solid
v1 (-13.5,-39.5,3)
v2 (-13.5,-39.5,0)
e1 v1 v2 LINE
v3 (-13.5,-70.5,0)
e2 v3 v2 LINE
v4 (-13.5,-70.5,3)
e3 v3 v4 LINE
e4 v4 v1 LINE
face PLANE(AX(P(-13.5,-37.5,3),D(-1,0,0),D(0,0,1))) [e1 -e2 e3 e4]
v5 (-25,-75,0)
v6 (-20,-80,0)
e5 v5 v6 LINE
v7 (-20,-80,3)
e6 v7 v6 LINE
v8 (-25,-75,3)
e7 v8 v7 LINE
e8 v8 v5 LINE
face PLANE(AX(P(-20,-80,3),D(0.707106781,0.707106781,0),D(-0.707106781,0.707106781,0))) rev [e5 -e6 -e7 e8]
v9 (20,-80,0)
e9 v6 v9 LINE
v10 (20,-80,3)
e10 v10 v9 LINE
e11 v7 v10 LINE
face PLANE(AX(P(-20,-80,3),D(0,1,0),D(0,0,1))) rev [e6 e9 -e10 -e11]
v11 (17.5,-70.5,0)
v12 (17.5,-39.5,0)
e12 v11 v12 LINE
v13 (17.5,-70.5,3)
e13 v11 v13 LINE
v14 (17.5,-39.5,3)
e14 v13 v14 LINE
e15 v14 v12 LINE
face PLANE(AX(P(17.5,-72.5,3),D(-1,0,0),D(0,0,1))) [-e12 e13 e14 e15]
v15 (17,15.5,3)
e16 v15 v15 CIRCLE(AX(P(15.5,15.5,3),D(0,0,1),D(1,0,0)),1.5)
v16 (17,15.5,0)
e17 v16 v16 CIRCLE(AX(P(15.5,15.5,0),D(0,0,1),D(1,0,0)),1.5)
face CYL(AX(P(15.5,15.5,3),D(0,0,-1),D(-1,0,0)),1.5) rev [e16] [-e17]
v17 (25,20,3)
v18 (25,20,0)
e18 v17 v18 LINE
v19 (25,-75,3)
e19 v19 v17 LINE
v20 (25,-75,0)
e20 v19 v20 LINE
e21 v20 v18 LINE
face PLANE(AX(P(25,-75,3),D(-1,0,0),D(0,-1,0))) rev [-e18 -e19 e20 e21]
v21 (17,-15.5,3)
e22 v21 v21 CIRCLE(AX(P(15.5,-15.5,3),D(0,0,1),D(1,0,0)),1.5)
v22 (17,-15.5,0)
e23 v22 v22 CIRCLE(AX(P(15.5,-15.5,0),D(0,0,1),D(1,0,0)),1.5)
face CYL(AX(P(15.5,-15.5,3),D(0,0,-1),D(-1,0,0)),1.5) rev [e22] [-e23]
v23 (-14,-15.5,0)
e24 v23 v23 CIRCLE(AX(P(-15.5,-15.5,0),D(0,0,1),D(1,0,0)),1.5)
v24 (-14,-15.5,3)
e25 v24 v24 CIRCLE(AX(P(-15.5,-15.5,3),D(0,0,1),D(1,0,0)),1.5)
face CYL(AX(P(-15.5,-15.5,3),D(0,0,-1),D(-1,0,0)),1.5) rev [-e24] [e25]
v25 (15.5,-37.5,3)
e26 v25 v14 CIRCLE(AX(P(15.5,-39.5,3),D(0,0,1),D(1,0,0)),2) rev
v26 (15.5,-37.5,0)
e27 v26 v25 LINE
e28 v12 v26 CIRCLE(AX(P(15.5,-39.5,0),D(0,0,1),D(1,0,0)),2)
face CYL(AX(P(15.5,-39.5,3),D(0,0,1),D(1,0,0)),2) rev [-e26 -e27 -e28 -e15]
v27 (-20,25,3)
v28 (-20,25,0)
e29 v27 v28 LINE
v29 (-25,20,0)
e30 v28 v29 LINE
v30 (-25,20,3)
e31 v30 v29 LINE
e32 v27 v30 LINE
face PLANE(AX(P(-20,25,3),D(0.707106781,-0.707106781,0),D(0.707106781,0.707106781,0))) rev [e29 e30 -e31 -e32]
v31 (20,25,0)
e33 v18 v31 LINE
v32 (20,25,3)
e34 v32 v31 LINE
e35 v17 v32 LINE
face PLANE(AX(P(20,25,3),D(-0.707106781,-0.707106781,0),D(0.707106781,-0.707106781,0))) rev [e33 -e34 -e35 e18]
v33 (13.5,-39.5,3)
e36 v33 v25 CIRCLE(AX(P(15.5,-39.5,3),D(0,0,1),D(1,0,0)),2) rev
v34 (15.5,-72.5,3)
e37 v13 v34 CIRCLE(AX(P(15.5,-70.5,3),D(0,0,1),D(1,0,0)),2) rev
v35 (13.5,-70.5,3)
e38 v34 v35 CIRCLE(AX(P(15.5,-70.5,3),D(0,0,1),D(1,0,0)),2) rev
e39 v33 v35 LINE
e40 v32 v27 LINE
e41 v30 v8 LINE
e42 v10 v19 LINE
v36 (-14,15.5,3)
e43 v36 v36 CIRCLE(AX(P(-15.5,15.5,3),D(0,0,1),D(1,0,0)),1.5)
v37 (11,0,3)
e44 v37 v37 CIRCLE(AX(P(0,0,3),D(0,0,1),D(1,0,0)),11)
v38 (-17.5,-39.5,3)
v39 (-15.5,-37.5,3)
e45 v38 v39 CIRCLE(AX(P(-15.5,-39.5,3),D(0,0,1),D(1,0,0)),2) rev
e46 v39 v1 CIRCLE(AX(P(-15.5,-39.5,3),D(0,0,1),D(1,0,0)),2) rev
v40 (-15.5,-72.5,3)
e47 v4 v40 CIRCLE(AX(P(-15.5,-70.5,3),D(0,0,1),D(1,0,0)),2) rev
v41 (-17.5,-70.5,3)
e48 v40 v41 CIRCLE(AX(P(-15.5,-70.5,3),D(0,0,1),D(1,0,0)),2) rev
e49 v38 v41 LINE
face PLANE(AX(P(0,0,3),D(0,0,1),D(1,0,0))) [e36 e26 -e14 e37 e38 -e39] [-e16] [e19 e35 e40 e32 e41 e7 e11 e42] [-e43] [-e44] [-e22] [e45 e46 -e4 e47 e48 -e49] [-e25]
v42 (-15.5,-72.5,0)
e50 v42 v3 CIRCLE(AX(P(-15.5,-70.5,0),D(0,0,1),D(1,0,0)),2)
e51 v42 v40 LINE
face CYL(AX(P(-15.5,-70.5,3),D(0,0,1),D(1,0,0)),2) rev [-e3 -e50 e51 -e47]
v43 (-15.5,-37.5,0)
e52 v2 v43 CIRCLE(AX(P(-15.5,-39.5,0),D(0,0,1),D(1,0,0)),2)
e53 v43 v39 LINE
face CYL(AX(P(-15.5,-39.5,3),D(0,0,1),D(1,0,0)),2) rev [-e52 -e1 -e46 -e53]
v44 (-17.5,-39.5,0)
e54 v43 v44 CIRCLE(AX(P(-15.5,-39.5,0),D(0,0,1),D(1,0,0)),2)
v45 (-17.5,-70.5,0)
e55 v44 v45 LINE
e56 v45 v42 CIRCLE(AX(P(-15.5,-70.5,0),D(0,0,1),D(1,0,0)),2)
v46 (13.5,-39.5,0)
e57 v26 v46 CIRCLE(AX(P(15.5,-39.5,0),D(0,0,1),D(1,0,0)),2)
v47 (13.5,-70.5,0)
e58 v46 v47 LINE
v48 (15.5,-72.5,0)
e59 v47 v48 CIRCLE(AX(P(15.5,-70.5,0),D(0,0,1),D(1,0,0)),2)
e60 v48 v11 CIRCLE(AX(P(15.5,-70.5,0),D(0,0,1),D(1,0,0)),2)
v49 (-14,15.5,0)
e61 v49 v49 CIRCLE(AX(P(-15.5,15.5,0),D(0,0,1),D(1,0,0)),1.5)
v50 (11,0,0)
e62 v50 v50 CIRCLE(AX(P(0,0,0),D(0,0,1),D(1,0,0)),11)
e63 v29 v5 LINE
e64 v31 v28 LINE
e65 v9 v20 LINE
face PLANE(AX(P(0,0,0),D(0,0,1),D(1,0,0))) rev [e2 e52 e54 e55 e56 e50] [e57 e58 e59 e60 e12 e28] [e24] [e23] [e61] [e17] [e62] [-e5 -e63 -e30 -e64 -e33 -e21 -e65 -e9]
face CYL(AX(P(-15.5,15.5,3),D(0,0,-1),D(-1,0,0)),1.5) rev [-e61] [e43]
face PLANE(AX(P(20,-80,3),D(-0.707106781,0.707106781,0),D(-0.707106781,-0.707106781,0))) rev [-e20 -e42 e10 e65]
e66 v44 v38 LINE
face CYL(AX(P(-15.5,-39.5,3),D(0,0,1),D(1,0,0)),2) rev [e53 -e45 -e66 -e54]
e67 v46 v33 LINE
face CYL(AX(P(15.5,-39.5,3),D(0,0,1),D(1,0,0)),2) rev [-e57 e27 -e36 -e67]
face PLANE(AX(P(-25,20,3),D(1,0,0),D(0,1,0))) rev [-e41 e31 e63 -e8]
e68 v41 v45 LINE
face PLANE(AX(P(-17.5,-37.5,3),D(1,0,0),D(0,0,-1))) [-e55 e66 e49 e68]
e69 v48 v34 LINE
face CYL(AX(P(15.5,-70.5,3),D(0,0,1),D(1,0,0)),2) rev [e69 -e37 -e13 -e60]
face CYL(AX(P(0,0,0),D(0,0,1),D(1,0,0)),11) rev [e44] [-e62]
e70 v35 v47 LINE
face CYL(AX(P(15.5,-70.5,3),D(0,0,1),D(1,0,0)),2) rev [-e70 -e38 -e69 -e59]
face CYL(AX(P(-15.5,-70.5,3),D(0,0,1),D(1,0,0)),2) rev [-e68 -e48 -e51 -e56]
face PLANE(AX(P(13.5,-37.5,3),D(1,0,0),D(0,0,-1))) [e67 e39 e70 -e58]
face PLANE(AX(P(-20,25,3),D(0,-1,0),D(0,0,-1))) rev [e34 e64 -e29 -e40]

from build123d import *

# Parameters (mm, degrees)
SKETCH_1_R          = 1.5
SKETCH_1_W          = 4
SKETCH_1_H          = 35
EXTRUDE_1_DEPTH     = 3
FILLET_1_R          = 2
SKETCH_2_R          = 11
CUT_EXTRUDE_1_DEPTH = 3


with BuildPart() as part:
    # 草图1 → 凸台-拉伸1 (new body)
    with BuildSketch(Plane.XY):
        Polygon((-20, 25), (-25, 20), (-25, -75), (-20, -80), (20, -80), (25, -75), (25, 20), (20, 25), align=None)
        with Locations((-15.5, 15.5)):
            Circle(SKETCH_1_R, mode=Mode.SUBTRACT)
        with Locations((15.5, 15.5)):
            Circle(SKETCH_1_R, mode=Mode.SUBTRACT)
        with Locations((15.5, -15.5)):
            Circle(SKETCH_1_R, mode=Mode.SUBTRACT)
        with Locations((-15.5, -15.5)):
            Circle(SKETCH_1_R, mode=Mode.SUBTRACT)
        with Locations((-15.5, -55)):
            Rectangle(SKETCH_1_W, SKETCH_1_H, mode=Mode.SUBTRACT)
        with Locations((15.5, -55)):
            Rectangle(SKETCH_1_W, SKETCH_1_H, mode=Mode.SUBTRACT)
    extrude(amount=EXTRUDE_1_DEPTH)

    # 圆角1
    fillet_1_edges = [part.edges().sort_by_distance(p)[0] for p in [
        (17.5, -72.5, 1.5),
        (-13.5, -72.5, 1.5),
        (13.5, -37.5, 1.5),
        (-17.5, -37.5, 1.5),
        (-17.5, -72.5, 1.5),
        (13.5, -72.5, 1.5),
        (17.5, -37.5, 1.5),
        (-13.5, -37.5, 1.5),
    ]]
    fillet(fillet_1_edges, radius=FILLET_1_R - 0.0001)  # a hair under: the kernel refuses the full size

    # 草图2 → 切除-拉伸1 (cut)
    with BuildSketch(Plane.XY.offset(3)):
        Circle(SKETCH_2_R)
    extrude(amount=-CUT_EXTRUDE_1_DEPTH, mode=Mode.SUBTRACT)


solid = part.part
